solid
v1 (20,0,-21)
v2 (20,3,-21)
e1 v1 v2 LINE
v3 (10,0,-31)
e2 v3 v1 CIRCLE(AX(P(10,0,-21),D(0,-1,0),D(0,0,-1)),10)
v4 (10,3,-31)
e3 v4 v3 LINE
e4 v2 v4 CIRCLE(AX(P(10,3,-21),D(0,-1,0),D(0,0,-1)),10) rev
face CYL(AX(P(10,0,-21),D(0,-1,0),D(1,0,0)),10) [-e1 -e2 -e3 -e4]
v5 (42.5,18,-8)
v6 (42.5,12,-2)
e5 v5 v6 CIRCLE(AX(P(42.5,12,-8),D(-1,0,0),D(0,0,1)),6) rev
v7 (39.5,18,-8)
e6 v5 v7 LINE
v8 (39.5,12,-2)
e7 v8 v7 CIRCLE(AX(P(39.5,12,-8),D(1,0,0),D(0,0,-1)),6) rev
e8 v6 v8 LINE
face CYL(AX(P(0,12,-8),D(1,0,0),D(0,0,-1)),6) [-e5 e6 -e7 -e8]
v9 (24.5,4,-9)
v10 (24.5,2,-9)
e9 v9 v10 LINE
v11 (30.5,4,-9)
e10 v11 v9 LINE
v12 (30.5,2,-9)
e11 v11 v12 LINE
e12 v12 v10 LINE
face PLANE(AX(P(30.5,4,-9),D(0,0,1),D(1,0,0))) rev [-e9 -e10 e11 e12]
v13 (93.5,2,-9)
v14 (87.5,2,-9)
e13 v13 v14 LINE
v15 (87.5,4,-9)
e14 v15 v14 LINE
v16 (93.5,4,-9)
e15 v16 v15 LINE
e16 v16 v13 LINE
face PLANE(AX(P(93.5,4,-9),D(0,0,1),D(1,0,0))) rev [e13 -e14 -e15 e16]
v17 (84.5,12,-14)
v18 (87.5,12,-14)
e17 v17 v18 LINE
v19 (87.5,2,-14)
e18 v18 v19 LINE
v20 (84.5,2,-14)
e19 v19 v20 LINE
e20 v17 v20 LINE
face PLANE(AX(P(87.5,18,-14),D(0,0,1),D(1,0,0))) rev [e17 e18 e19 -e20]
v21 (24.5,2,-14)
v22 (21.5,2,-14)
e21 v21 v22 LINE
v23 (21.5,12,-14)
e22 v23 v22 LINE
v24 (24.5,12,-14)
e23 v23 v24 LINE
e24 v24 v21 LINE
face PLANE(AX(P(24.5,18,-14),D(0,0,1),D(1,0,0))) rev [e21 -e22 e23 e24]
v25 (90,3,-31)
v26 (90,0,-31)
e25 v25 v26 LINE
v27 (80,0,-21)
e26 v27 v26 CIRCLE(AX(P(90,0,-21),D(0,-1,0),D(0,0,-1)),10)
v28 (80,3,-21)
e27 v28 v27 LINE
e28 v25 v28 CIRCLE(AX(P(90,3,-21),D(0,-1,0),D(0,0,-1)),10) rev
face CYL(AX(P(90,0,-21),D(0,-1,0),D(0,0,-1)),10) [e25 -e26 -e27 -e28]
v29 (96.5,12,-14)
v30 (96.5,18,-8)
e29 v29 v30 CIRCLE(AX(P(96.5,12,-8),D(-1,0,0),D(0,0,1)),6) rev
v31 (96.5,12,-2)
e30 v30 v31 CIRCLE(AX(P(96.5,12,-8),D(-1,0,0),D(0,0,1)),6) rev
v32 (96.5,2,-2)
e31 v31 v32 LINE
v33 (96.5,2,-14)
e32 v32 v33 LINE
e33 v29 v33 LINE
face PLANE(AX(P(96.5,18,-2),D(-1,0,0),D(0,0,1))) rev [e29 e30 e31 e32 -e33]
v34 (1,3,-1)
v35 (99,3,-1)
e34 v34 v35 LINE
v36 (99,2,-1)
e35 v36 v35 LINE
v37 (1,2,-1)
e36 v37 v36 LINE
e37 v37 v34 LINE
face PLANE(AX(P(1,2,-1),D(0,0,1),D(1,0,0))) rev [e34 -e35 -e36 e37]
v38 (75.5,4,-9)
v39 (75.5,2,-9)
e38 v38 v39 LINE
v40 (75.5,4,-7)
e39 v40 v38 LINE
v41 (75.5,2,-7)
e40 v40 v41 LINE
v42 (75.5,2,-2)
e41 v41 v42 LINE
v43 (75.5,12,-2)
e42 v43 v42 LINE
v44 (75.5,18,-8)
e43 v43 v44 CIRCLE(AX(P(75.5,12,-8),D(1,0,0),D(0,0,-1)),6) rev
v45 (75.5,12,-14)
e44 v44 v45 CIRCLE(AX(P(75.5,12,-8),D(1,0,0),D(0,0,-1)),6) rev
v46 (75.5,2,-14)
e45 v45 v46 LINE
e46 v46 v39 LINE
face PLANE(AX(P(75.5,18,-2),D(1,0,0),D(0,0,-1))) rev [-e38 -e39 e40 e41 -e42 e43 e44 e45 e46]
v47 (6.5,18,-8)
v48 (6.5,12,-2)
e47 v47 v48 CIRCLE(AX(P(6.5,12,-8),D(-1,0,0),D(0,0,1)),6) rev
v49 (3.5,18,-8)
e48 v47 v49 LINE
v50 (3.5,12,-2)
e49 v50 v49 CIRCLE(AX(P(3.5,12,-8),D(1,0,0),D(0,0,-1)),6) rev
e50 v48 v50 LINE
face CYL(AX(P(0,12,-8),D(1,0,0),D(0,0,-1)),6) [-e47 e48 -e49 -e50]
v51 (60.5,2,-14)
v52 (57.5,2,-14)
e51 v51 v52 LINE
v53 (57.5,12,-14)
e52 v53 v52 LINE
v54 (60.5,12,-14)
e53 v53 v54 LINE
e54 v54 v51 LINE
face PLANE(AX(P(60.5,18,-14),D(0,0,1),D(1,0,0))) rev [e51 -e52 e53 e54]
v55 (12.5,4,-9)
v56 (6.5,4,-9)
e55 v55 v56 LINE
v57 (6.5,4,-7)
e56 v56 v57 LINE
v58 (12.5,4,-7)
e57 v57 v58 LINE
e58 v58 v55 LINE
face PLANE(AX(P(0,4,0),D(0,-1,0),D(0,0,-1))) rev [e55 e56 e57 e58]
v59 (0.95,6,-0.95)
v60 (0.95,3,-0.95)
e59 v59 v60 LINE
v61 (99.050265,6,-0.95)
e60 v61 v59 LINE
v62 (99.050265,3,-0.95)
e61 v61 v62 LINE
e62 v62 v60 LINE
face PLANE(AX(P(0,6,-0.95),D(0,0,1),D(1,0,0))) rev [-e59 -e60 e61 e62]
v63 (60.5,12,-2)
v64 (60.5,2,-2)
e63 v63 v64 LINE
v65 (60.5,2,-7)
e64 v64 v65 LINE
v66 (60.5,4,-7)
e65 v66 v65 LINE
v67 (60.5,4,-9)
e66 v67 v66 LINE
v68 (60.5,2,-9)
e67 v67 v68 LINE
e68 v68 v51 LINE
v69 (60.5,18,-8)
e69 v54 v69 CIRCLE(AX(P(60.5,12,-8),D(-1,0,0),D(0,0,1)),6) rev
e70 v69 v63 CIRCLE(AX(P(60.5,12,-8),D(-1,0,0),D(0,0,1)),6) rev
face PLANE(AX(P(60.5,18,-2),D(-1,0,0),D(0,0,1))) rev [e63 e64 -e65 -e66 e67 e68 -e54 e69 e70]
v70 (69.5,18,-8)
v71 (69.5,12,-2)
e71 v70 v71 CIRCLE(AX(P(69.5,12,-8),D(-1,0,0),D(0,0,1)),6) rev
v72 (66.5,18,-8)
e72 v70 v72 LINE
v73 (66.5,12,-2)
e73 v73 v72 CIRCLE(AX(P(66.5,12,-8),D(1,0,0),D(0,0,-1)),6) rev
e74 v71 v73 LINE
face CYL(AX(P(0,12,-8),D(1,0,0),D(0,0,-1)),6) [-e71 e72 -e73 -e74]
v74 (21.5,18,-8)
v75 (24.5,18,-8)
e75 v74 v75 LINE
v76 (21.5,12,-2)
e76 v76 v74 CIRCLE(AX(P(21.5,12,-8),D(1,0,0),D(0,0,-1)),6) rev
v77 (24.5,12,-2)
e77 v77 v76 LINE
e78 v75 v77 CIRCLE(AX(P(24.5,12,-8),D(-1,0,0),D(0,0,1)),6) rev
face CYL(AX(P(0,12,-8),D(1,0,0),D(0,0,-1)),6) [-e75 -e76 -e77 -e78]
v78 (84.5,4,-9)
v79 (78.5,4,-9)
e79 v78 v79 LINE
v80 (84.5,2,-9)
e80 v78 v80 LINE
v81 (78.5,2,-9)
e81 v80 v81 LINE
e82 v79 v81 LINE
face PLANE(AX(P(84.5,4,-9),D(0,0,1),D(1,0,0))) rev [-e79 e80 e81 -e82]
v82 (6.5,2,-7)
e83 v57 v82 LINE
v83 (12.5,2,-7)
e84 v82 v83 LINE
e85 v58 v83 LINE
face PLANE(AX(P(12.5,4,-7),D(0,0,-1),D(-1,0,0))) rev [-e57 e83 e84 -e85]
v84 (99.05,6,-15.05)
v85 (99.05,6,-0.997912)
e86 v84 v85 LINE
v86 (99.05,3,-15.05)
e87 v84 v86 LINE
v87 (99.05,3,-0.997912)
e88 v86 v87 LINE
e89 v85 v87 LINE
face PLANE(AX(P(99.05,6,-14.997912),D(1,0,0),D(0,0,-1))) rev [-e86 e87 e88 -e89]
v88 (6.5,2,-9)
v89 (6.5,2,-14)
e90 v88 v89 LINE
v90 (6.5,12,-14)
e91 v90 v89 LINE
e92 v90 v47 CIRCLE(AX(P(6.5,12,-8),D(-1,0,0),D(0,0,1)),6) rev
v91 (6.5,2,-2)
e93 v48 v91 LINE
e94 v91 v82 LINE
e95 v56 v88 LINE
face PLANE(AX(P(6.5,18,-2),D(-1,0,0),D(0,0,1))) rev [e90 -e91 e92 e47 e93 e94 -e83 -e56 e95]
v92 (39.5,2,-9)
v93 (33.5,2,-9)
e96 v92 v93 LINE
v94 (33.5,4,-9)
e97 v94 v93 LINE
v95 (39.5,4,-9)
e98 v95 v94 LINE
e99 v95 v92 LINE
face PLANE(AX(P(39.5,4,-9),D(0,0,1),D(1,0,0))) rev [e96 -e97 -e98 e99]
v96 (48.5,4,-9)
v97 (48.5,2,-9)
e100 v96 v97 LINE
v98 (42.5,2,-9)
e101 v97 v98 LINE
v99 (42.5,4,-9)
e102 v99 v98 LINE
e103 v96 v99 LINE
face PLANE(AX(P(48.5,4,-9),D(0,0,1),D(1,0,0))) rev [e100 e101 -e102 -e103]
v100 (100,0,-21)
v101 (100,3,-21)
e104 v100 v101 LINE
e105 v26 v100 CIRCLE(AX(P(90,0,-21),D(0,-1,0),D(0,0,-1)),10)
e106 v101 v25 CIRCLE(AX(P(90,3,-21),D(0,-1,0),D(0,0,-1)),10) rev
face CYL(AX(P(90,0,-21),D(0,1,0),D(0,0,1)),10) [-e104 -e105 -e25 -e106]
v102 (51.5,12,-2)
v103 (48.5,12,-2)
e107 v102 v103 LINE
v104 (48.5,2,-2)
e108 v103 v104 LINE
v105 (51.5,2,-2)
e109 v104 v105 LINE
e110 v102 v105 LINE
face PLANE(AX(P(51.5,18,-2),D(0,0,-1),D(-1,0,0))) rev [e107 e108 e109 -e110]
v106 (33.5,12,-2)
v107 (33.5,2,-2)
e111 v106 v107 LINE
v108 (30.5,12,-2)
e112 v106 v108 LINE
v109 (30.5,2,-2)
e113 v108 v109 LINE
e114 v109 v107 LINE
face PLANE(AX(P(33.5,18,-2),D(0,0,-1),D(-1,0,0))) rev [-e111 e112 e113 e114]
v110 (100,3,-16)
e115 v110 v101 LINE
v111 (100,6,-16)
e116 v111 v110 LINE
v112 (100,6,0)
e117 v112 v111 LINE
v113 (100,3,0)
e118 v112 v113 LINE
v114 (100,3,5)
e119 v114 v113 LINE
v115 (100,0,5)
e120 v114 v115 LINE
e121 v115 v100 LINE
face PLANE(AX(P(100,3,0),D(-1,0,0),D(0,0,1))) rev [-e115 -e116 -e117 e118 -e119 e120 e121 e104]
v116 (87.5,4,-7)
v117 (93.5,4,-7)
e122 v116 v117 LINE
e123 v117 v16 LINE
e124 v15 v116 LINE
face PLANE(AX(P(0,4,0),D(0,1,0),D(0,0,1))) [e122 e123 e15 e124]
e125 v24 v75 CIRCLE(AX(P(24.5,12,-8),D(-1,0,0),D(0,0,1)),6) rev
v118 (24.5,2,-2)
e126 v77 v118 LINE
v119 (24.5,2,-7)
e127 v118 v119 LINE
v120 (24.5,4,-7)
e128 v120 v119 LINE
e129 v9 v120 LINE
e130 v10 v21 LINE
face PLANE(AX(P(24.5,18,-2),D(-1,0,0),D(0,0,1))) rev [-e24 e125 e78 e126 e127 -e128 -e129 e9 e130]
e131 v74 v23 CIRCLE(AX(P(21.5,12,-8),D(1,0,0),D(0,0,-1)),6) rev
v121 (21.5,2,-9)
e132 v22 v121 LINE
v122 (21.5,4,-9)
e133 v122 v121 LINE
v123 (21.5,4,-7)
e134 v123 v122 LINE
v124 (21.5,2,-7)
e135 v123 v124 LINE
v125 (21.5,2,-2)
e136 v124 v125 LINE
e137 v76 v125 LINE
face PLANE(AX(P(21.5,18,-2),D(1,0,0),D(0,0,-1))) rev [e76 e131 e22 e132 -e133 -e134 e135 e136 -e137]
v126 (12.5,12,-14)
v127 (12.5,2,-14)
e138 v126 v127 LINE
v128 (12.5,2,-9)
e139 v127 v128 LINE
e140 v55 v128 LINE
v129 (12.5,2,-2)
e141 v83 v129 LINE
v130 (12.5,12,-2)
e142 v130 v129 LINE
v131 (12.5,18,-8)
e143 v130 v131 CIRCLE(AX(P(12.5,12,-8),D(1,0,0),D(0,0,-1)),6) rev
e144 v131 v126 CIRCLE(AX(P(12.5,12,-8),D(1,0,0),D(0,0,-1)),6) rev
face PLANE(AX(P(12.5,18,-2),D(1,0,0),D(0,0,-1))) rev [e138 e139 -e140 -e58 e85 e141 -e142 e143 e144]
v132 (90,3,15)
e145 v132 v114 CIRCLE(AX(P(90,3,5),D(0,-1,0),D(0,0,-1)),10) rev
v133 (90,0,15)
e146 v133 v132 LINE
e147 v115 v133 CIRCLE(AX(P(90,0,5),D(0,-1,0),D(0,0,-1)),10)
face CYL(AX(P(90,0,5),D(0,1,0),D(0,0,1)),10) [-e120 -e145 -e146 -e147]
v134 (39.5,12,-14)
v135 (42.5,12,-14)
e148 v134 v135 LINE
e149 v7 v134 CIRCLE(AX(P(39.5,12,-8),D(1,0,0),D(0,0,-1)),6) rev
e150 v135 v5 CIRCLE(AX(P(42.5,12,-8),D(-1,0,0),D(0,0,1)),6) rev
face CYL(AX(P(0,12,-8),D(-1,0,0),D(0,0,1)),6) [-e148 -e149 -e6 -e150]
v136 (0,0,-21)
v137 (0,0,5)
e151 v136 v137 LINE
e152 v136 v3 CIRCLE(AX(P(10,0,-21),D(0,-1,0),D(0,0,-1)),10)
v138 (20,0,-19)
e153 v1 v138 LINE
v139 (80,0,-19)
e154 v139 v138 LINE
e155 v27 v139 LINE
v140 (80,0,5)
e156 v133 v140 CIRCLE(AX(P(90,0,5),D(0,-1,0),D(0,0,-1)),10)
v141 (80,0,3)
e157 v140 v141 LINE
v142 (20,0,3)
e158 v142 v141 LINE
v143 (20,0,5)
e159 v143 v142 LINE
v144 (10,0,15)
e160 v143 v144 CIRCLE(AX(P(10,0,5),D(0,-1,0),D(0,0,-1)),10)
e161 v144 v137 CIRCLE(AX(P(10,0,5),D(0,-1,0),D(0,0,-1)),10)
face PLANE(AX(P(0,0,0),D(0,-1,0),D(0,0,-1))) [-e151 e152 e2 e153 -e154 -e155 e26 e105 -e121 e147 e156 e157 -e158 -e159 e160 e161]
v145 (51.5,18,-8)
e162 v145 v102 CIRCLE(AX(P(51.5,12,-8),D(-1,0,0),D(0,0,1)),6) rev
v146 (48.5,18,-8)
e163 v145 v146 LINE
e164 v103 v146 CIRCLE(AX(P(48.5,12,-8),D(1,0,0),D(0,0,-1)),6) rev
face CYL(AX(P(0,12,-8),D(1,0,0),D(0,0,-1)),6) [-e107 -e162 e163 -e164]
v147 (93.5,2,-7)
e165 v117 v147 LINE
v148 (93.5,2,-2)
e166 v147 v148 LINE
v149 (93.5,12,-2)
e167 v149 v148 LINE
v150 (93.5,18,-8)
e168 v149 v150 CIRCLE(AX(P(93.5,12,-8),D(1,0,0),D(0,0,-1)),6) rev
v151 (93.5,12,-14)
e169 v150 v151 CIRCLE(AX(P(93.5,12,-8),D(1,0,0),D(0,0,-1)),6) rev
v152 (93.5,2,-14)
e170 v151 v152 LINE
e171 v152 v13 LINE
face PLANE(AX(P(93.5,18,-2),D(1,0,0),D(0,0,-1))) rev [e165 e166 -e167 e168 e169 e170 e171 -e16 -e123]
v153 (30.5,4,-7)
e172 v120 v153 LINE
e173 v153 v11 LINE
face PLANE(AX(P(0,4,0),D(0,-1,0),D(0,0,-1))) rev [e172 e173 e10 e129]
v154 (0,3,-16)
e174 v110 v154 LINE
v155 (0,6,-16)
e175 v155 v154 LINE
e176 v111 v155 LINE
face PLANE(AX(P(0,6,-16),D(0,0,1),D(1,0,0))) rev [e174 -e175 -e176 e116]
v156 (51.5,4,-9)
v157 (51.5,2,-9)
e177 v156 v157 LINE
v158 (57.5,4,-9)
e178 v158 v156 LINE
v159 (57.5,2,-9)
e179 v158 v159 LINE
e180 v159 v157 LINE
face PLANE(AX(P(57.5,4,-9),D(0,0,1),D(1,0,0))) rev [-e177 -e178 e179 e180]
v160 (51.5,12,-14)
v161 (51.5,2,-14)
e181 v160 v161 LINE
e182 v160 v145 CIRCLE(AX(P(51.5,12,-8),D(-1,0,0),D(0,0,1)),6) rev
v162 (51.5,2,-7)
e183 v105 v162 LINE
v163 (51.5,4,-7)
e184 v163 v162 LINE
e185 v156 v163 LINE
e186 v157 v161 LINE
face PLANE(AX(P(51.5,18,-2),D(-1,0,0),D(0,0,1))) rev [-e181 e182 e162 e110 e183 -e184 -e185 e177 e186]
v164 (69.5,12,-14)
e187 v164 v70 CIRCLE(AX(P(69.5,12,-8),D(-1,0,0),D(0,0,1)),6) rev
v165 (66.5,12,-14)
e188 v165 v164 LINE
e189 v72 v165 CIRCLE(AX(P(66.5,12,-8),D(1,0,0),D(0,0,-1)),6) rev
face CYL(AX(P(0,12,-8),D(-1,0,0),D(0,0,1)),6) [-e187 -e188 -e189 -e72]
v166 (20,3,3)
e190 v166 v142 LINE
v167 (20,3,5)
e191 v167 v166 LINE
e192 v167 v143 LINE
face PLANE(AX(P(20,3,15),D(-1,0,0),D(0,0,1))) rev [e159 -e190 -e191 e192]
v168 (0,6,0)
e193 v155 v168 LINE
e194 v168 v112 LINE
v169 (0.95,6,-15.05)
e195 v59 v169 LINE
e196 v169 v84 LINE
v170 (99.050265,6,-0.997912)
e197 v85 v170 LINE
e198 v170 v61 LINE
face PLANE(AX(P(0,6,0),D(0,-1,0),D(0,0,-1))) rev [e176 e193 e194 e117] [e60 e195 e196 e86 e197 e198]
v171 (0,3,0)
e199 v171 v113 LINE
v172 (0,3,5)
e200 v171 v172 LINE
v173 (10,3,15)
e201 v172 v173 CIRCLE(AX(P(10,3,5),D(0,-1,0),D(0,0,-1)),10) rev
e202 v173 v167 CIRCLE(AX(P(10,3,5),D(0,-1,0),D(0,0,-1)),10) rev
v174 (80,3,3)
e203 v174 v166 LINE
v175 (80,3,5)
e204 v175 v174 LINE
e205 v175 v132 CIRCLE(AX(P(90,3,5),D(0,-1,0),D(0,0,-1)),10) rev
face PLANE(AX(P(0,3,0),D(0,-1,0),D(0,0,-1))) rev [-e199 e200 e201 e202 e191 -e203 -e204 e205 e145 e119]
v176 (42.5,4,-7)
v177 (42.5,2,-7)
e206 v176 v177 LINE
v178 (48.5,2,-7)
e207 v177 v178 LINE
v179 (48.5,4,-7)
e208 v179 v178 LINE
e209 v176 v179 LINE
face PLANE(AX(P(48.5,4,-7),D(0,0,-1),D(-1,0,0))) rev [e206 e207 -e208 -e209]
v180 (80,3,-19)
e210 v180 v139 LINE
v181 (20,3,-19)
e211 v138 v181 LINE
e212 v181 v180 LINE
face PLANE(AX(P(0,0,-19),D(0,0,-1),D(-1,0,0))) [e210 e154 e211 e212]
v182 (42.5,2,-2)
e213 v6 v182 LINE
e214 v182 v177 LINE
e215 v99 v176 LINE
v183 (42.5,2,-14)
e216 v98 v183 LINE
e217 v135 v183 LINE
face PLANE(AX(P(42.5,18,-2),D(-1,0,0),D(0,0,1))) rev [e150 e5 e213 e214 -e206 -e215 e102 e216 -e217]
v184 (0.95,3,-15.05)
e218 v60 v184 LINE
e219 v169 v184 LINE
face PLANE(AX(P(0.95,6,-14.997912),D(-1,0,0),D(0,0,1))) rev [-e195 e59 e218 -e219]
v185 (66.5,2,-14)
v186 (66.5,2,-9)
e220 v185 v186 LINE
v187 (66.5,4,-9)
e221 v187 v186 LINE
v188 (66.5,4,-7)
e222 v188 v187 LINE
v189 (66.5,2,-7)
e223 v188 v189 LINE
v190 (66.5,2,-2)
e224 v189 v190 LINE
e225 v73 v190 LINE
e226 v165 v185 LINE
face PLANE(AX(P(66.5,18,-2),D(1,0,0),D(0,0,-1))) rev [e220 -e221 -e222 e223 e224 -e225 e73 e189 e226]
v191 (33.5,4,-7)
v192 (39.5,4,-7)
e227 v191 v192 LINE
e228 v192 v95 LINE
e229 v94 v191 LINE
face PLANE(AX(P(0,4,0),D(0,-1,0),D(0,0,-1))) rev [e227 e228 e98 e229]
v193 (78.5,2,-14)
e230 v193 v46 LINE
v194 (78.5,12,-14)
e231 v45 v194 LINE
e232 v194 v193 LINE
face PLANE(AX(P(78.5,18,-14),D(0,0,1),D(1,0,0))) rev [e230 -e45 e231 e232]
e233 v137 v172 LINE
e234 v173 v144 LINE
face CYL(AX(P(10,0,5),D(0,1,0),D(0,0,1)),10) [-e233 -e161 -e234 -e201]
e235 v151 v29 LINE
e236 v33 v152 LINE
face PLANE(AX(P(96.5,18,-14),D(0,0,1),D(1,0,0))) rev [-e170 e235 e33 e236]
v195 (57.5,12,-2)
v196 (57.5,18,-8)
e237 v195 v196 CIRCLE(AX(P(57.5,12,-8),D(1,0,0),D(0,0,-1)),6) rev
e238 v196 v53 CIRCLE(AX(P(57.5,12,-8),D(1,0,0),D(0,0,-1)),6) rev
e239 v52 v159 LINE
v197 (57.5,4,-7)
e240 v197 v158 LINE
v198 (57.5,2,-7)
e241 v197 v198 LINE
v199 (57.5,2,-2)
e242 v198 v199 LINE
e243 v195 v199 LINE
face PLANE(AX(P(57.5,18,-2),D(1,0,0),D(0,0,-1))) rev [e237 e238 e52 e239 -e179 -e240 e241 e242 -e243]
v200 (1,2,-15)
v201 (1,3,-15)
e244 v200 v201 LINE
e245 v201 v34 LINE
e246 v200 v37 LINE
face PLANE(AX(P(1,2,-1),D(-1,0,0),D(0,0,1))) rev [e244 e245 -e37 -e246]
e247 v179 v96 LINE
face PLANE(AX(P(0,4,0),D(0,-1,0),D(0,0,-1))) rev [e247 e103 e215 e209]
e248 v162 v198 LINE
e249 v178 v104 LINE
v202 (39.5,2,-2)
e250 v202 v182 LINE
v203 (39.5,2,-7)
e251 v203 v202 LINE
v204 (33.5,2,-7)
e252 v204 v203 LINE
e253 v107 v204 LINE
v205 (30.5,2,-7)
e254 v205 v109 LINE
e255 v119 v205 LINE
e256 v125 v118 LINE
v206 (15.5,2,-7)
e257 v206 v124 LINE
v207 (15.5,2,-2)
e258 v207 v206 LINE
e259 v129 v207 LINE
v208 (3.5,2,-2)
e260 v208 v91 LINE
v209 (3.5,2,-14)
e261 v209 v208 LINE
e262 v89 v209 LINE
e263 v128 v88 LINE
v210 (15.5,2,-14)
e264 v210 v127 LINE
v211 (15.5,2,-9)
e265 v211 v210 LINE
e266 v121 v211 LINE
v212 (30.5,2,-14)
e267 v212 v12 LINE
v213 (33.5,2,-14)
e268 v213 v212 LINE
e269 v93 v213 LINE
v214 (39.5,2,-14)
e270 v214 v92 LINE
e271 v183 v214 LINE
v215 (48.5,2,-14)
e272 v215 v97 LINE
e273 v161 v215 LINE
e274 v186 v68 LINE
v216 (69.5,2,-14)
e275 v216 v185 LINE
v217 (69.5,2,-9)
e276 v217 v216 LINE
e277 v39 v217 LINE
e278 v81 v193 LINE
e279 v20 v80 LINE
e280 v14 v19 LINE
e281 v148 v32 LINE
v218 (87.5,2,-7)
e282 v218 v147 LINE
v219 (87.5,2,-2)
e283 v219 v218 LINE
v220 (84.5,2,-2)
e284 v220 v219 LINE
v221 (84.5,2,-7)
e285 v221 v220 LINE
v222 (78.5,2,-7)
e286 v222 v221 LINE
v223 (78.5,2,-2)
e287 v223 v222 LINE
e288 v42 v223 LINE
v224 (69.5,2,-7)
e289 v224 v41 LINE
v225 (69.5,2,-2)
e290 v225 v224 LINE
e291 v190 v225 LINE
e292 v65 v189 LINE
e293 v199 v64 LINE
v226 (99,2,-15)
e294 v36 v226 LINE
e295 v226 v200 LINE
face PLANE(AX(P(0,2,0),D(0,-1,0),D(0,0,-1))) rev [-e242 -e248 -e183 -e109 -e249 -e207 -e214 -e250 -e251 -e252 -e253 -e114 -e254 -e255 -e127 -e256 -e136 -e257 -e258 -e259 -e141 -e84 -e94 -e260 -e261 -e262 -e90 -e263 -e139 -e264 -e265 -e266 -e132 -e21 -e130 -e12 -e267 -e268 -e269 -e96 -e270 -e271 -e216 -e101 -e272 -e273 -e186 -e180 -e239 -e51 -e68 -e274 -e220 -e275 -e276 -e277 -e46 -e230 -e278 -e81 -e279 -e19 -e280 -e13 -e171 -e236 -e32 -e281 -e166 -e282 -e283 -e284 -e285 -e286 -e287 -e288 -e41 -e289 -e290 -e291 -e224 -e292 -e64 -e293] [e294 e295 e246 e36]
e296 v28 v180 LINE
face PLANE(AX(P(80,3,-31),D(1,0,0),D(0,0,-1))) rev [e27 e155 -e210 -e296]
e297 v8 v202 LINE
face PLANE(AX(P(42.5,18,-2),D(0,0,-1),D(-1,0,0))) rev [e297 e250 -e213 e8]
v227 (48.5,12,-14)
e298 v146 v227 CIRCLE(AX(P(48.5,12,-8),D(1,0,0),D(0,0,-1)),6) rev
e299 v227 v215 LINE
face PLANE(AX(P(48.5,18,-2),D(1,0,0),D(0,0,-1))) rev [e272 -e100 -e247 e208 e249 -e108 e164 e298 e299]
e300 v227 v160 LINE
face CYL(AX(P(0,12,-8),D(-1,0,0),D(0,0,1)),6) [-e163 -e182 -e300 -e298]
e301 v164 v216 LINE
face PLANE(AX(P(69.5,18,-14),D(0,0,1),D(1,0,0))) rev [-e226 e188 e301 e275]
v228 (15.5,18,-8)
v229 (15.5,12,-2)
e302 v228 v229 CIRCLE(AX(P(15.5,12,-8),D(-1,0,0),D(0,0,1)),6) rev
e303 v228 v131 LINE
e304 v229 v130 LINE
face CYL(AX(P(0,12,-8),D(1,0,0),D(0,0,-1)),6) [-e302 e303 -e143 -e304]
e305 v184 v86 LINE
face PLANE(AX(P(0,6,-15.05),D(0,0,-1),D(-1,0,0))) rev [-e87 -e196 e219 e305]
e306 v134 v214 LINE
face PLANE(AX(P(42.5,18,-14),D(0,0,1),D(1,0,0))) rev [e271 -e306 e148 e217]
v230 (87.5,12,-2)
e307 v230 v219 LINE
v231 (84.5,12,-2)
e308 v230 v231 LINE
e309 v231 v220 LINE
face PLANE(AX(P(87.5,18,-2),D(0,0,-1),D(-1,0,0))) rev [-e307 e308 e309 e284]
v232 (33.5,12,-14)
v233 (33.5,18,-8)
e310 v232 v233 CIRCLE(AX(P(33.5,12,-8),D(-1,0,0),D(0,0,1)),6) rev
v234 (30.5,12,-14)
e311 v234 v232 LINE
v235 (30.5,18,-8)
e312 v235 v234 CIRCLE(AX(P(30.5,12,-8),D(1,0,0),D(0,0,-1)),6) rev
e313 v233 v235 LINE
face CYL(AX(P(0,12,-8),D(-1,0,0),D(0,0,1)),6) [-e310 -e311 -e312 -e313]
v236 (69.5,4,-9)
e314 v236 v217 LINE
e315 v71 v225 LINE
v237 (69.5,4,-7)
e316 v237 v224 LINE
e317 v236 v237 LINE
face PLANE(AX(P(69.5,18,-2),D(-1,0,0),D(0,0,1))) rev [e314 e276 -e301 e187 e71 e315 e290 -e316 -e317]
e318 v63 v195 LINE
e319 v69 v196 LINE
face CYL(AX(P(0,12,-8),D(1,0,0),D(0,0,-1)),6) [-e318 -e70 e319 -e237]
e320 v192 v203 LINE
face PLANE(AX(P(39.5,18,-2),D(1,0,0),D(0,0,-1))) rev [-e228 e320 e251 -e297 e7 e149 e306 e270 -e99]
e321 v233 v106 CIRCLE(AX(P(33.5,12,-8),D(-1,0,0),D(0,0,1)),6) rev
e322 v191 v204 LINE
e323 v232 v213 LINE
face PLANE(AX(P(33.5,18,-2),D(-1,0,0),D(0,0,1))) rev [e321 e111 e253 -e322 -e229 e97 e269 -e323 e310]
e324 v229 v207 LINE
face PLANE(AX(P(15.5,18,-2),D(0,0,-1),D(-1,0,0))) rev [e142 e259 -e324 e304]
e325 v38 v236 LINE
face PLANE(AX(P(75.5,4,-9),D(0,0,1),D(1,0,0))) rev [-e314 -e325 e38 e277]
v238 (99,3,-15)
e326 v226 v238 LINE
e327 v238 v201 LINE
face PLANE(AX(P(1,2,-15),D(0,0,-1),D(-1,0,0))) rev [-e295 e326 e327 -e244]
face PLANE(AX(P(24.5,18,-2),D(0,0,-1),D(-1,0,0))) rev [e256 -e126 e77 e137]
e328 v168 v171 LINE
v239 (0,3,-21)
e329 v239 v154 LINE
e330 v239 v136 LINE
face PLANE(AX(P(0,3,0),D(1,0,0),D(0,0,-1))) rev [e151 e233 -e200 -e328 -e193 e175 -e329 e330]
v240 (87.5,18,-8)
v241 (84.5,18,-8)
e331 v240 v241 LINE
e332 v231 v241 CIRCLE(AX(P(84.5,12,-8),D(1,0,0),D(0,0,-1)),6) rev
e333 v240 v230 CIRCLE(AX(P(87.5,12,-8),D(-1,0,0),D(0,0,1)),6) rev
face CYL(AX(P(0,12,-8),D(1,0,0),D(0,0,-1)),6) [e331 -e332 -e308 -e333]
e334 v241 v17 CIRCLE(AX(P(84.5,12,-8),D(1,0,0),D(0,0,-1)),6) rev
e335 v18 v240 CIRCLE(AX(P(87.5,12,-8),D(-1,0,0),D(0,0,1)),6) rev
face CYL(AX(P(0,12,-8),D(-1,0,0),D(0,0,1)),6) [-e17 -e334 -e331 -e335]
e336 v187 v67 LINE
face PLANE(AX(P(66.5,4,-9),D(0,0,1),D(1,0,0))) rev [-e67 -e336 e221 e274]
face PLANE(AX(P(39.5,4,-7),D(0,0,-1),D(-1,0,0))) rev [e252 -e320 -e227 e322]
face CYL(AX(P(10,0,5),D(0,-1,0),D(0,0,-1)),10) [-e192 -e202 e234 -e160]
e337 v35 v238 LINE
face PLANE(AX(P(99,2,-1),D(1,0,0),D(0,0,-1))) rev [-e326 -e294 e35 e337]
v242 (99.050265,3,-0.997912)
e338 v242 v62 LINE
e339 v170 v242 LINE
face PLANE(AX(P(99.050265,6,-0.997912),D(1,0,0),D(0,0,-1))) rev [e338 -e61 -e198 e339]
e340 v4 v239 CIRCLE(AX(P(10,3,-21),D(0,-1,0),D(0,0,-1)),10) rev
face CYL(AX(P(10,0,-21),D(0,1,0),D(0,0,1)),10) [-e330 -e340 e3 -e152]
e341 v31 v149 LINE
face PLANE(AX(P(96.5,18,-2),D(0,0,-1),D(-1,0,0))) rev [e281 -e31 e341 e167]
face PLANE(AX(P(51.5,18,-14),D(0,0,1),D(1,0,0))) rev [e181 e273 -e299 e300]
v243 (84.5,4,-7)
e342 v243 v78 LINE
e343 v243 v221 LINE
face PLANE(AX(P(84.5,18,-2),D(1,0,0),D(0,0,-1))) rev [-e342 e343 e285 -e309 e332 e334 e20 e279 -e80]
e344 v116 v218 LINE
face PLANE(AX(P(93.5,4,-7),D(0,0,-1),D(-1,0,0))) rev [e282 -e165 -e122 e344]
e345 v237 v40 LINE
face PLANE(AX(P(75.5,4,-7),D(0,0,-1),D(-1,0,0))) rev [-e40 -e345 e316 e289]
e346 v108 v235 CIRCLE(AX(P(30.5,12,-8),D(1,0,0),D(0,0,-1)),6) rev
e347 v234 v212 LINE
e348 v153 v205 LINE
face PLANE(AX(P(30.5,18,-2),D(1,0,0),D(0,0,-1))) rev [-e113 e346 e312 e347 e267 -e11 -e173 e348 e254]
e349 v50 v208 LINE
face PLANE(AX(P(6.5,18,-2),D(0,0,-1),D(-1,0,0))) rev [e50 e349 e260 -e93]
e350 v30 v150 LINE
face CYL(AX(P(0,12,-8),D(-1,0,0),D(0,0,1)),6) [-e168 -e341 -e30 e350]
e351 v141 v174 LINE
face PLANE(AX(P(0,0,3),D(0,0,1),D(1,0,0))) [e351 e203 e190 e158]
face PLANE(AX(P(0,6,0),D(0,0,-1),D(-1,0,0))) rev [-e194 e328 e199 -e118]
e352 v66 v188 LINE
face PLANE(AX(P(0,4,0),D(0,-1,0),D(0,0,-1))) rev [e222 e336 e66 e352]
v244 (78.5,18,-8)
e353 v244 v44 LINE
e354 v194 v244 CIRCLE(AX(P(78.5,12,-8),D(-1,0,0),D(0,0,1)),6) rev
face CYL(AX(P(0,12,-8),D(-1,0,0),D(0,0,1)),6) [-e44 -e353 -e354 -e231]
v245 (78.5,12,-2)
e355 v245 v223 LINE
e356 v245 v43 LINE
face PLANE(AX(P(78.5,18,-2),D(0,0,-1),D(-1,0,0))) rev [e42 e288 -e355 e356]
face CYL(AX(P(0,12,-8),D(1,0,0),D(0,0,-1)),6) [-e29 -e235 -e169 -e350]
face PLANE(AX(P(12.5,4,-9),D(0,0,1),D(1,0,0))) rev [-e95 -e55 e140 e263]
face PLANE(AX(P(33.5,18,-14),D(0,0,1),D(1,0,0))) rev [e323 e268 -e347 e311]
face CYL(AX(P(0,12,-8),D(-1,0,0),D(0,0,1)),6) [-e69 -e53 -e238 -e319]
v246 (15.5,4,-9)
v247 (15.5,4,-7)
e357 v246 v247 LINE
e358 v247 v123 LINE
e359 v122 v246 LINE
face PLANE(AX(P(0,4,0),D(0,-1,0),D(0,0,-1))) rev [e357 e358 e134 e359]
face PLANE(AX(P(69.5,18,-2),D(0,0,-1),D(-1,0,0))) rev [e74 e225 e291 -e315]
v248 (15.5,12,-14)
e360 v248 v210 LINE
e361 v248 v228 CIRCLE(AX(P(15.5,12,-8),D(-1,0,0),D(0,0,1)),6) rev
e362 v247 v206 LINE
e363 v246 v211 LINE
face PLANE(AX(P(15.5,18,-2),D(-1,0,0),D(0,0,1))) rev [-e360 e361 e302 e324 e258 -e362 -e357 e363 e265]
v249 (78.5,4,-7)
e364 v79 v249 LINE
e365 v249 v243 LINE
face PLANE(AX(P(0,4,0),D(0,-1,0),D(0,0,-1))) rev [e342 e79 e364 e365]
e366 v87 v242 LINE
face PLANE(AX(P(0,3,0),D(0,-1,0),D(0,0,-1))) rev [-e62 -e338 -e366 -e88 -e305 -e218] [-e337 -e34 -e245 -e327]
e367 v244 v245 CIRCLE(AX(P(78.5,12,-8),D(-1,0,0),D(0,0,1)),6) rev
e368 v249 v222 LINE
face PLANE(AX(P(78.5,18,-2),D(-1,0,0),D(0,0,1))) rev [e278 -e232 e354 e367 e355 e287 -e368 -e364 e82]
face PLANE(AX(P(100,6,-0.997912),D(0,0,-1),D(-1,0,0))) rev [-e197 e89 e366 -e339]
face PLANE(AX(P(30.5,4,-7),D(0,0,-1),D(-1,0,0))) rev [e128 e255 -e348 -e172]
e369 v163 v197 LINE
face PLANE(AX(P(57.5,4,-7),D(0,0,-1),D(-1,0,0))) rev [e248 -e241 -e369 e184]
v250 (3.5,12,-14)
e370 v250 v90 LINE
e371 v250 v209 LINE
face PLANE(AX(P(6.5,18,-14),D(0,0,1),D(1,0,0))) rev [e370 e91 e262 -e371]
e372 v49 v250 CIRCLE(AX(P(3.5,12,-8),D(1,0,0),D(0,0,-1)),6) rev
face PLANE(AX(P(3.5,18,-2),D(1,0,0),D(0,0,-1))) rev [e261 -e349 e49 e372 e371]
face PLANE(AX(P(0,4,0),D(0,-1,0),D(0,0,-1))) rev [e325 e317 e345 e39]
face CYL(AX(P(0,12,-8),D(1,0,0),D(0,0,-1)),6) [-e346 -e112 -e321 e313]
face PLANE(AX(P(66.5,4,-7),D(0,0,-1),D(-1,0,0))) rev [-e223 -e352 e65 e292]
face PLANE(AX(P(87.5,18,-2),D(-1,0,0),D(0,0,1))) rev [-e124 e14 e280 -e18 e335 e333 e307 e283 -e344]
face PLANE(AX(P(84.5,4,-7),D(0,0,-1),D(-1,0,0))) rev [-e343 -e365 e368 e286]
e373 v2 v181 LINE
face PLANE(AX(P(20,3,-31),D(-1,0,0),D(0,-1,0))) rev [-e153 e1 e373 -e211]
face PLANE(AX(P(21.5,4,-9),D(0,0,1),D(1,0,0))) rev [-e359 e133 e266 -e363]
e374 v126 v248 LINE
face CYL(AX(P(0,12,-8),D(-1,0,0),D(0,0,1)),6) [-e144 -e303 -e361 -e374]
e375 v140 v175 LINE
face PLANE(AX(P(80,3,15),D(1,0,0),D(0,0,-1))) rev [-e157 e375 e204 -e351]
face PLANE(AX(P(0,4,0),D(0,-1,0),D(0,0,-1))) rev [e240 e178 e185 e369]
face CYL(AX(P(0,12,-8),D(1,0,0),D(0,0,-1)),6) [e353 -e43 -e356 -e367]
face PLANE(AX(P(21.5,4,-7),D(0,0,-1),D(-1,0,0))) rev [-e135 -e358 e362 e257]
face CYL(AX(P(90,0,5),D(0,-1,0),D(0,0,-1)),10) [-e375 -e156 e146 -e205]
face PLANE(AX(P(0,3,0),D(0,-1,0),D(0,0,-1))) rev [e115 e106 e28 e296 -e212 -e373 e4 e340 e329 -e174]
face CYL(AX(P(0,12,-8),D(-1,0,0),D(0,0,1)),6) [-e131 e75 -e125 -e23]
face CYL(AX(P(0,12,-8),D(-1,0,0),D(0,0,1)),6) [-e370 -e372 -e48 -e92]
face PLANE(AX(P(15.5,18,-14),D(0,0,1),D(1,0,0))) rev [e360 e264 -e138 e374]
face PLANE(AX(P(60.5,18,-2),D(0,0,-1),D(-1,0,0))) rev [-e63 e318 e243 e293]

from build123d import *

# Parameters (mm, degrees)
SKETCH1_W            = 100
SKETCH1_H            = 16
BOSS_EXTRUDE1_DEPTH  = 3
SKETCH2_W            = 98
SKETCH2_H            = 14
CUT_EXTRUDE1_DEPTH   = 1
SKETCH5_W            = 20
SKETCH5_H            = 3
BOSS_EXTRUDE4_DEPTH  = 15
SKETCH6_W            = 20
SKETCH6_H            = 3
BOSS_EXTRUDE5_DEPTH  = 15
FILLET18_R           = 10
SKETCH7_W            = 3
SKETCH7_H            = 12
BOSS_EXTRUDE6_DEPTH  = 16
SKETCH8_W            = 6
SKETCH8_H            = 2
BOSS_EXTRUDE7_DEPTH  = 2
FILLET19_R           = 6
SKETCH10_W           = 60
SKETCH10_H           = 3
BOSS_EXTRUDE8_DEPTH  = 3
SKETCH11_W           = 60
SKETCH11_H           = 3
BOSS_EXTRUDE9_DEPTH  = 3
SKETCH12_W           = 0.95
SKETCH12_H           = 14
BOSS_EXTRUDE10_DEPTH = 3
SKETCH13_W           = 100
SKETCH13_H           = 0.95
BOSS_EXTRUDE11_DEPTH = 3
SKETCH14_W           = 0.95
SKETCH14_H           = 0.052088128
BOSS_EXTRUDE12_DEPTH = 3
SKETCH15_W           = 0.95
SKETCH15_H           = 0.047911872
SKETCH15_W_2         = 0.949734752
SKETCH15_H_2         = 0.052088128
BOSS_EXTRUDE13_DEPTH = 3


with BuildPart() as part:
    # Sketch1 → Boss-Extrude1 (new body)
    with BuildSketch(Plane(origin=(0, 0, 0), x_dir=(1, 0, 0), z_dir=(0, 1, 0))):
        with Locations((50, 8)):
            Rectangle(SKETCH1_W, SKETCH1_H)
    extrude(amount=BOSS_EXTRUDE1_DEPTH)

    # Sketch2 → Cut-Extrude1 (cut)
    with BuildSketch(Plane(origin=(0, 3, 0), x_dir=(1, 0, 0), z_dir=(0, 1, 0))):
        with Locations((50, 8)):
            Rectangle(SKETCH2_W, SKETCH2_H)
    extrude(amount=-CUT_EXTRUDE1_DEPTH, mode=Mode.SUBTRACT)

    # Sketch5 → Boss-Extrude4 (add)
    with BuildSketch(Plane.XY):
        with Locations((10, 1.5)):
            Rectangle(SKETCH5_W, SKETCH5_H)
        with Locations((90, 1.5)):
            Rectangle(SKETCH5_W, SKETCH5_H)
    extrude(amount=BOSS_EXTRUDE4_DEPTH)

    # Sketch6 → Boss-Extrude5 (add)
    with BuildSketch(Plane(origin=(0, 0, -16), x_dir=(-1, 0, 0), z_dir=(0, 0, -1))):
        with Locations((-90, 1.5)):
            Rectangle(SKETCH6_W, SKETCH6_H)
        with Locations((-10, 1.5)):
            Rectangle(SKETCH6_W, SKETCH6_H)
    extrude(amount=BOSS_EXTRUDE5_DEPTH)

    # Fillet18
    fillet18_edges = [part.edges().sort_by_distance(p)[0] for p in [
        (20, 1.5, 15),
        (0, 1.5, 15),
        (80, 1.5, 15),
        (100, 1.5, 15),
        (0, 1.5, -31),
        (20, 1.5, -31),
        (80, 1.5, -31),
        (100, 1.5, -31),
    ]]
    fillet(fillet18_edges, radius=FILLET18_R - 0.0001)  # a hair under: the kernel refuses the full size

    # Sketch7 → Boss-Extrude6 (add)
    with BuildSketch(Plane(origin=(0, 2, 0), x_dir=(1, 0, 0), z_dir=(0, 1, 0))):
        with Locations((95, 8)):
            Rectangle(SKETCH7_W, SKETCH7_H)
        with Locations((86, 8)):
            Rectangle(SKETCH7_W, SKETCH7_H)
        with Locations((77, 8)):
            Rectangle(SKETCH7_W, SKETCH7_H)
        with Locations((68, 8)):
            Rectangle(SKETCH7_W, SKETCH7_H)
        with Locations((59, 8)):
            Rectangle(SKETCH7_W, SKETCH7_H)
        with Locations((50, 8)):
            Rectangle(SKETCH7_W, SKETCH7_H)
        with Locations((41, 8)):
            Rectangle(SKETCH7_W, SKETCH7_H)
        with Locations((32, 8)):
            Rectangle(SKETCH7_W, SKETCH7_H)
        with Locations((23, 8)):
            Rectangle(SKETCH7_W, SKETCH7_H)
        with Locations((14, 8)):
            Rectangle(SKETCH7_W, SKETCH7_H)
        with Locations((5, 8)):
            Rectangle(SKETCH7_W, SKETCH7_H)
    extrude(amount=BOSS_EXTRUDE6_DEPTH)

    # Sketch8 → Boss-Extrude7 (add)
    with BuildSketch(Plane(origin=(0, 2, 0), x_dir=(1, 0, 0), z_dir=(0, 1, 0))):
        with Locations((90.5, 8)):
            Rectangle(SKETCH8_W, SKETCH8_H)
        with Locations((81.5, 8)):
            Rectangle(SKETCH8_W, SKETCH8_H)
        with Locations((72.5, 8)):
            Rectangle(SKETCH8_W, SKETCH8_H)
        with Locations((63.5, 8)):
            Rectangle(SKETCH8_W, SKETCH8_H)
        with Locations((54.5, 8)):
            Rectangle(SKETCH8_W, SKETCH8_H)
        with Locations((45.5, 8)):
            Rectangle(SKETCH8_W, SKETCH8_H)
        with Locations((36.5, 8)):
            Rectangle(SKETCH8_W, SKETCH8_H)
        with Locations((27.5, 8)):
            Rectangle(SKETCH8_W, SKETCH8_H)
        with Locations((18.5, 8)):
            Rectangle(SKETCH8_W, SKETCH8_H)
        with Locations((9.5, 8)):
            Rectangle(SKETCH8_W, SKETCH8_H)
    extrude(amount=BOSS_EXTRUDE7_DEPTH)

    # Fillet19
    fillet19_edges = [part.edges().sort_by_distance(p)[0] for p in [
        (95, 18, -2),
        (95, 18, -14),
        (86, 18, -2),
        (86, 18, -14),
        (77, 18, -2),
        (77, 18, -14),
        (68, 18, -2),
        (68, 18, -14),
        (59, 18, -2),
        (59, 18, -14),
        (50, 18, -2),
        (50, 18, -14),
        (41, 18, -2),
        (41, 18, -14),
        (32, 18, -2),
        (32, 18, -14),
        (23, 18, -14),
        (23, 18, -2),
        (14, 18, -2),
        (14, 18, -14),
        (5, 18, -2),
        (5, 18, -14),
    ]]
    fillet(fillet19_edges, radius=FILLET19_R - 0.0001)  # a hair under: the kernel refuses the full size

    # Sketch10 → Boss-Extrude8 (add)
    with BuildSketch(Plane(origin=(0, 0, -16), x_dir=(-1, 0, 0), z_dir=(0, 0, -1))):
        with Locations((-50, 1.5)):
            Rectangle(SKETCH10_W, SKETCH10_H)
    extrude(amount=BOSS_EXTRUDE8_DEPTH)

    # Sketch11 → Boss-Extrude9 (add)
    with BuildSketch(Plane.XY):
        with Locations((50, 1.5)):
            Rectangle(SKETCH11_W, SKETCH11_H)
    extrude(amount=BOSS_EXTRUDE9_DEPTH)

    # Sketch12 → Boss-Extrude10 (add)
    with BuildSketch(Plane(origin=(0, 3, 0), x_dir=(1, 0, 0), z_dir=(0, 1, 0))):
        with Locations((99.525, 7.997911872)):
            Rectangle(SKETCH12_W, SKETCH12_H)
        with Locations((0.475, 7.997911872)):
            Rectangle(SKETCH12_W, SKETCH12_H)
    extrude(amount=BOSS_EXTRUDE10_DEPTH)

    # Sketch13 → Boss-Extrude11 (add)
    with BuildSketch(Plane(origin=(0, 3, 0), x_dir=(1, 0, 0), z_dir=(0, 1, 0))):
        with Locations((50, 15.525)):
            Rectangle(SKETCH13_W, SKETCH13_H)
        with Locations((50, 0.475)):
            Rectangle(SKETCH13_W, SKETCH13_H)
    extrude(amount=BOSS_EXTRUDE11_DEPTH)

    # Sketch14 → Boss-Extrude12 (add)
    with BuildSketch(Plane(origin=(0, 3, 0), x_dir=(1, 0, 0), z_dir=(0, 1, 0))):
        with Locations((0.475, 15.023955936)):
            Rectangle(SKETCH14_W, SKETCH14_H)
    extrude(amount=BOSS_EXTRUDE12_DEPTH)

    # Sketch15 → Boss-Extrude13 (add)
    with BuildSketch(Plane(origin=(0, 3, 0), x_dir=(1, 0, 0), z_dir=(0, 1, 0))):
        with Locations((0.475, 0.973955936)):
            Rectangle(SKETCH15_W, SKETCH15_H)
        with Locations((99.525132624, 0.973955936)):
            Rectangle(SKETCH15_W_2, SKETCH15_H)
        with Locations((99.525, 15.023955936)):
            Rectangle(SKETCH15_W, SKETCH15_H_2)
    extrude(amount=BOSS_EXTRUDE13_DEPTH)


solid = part.part
